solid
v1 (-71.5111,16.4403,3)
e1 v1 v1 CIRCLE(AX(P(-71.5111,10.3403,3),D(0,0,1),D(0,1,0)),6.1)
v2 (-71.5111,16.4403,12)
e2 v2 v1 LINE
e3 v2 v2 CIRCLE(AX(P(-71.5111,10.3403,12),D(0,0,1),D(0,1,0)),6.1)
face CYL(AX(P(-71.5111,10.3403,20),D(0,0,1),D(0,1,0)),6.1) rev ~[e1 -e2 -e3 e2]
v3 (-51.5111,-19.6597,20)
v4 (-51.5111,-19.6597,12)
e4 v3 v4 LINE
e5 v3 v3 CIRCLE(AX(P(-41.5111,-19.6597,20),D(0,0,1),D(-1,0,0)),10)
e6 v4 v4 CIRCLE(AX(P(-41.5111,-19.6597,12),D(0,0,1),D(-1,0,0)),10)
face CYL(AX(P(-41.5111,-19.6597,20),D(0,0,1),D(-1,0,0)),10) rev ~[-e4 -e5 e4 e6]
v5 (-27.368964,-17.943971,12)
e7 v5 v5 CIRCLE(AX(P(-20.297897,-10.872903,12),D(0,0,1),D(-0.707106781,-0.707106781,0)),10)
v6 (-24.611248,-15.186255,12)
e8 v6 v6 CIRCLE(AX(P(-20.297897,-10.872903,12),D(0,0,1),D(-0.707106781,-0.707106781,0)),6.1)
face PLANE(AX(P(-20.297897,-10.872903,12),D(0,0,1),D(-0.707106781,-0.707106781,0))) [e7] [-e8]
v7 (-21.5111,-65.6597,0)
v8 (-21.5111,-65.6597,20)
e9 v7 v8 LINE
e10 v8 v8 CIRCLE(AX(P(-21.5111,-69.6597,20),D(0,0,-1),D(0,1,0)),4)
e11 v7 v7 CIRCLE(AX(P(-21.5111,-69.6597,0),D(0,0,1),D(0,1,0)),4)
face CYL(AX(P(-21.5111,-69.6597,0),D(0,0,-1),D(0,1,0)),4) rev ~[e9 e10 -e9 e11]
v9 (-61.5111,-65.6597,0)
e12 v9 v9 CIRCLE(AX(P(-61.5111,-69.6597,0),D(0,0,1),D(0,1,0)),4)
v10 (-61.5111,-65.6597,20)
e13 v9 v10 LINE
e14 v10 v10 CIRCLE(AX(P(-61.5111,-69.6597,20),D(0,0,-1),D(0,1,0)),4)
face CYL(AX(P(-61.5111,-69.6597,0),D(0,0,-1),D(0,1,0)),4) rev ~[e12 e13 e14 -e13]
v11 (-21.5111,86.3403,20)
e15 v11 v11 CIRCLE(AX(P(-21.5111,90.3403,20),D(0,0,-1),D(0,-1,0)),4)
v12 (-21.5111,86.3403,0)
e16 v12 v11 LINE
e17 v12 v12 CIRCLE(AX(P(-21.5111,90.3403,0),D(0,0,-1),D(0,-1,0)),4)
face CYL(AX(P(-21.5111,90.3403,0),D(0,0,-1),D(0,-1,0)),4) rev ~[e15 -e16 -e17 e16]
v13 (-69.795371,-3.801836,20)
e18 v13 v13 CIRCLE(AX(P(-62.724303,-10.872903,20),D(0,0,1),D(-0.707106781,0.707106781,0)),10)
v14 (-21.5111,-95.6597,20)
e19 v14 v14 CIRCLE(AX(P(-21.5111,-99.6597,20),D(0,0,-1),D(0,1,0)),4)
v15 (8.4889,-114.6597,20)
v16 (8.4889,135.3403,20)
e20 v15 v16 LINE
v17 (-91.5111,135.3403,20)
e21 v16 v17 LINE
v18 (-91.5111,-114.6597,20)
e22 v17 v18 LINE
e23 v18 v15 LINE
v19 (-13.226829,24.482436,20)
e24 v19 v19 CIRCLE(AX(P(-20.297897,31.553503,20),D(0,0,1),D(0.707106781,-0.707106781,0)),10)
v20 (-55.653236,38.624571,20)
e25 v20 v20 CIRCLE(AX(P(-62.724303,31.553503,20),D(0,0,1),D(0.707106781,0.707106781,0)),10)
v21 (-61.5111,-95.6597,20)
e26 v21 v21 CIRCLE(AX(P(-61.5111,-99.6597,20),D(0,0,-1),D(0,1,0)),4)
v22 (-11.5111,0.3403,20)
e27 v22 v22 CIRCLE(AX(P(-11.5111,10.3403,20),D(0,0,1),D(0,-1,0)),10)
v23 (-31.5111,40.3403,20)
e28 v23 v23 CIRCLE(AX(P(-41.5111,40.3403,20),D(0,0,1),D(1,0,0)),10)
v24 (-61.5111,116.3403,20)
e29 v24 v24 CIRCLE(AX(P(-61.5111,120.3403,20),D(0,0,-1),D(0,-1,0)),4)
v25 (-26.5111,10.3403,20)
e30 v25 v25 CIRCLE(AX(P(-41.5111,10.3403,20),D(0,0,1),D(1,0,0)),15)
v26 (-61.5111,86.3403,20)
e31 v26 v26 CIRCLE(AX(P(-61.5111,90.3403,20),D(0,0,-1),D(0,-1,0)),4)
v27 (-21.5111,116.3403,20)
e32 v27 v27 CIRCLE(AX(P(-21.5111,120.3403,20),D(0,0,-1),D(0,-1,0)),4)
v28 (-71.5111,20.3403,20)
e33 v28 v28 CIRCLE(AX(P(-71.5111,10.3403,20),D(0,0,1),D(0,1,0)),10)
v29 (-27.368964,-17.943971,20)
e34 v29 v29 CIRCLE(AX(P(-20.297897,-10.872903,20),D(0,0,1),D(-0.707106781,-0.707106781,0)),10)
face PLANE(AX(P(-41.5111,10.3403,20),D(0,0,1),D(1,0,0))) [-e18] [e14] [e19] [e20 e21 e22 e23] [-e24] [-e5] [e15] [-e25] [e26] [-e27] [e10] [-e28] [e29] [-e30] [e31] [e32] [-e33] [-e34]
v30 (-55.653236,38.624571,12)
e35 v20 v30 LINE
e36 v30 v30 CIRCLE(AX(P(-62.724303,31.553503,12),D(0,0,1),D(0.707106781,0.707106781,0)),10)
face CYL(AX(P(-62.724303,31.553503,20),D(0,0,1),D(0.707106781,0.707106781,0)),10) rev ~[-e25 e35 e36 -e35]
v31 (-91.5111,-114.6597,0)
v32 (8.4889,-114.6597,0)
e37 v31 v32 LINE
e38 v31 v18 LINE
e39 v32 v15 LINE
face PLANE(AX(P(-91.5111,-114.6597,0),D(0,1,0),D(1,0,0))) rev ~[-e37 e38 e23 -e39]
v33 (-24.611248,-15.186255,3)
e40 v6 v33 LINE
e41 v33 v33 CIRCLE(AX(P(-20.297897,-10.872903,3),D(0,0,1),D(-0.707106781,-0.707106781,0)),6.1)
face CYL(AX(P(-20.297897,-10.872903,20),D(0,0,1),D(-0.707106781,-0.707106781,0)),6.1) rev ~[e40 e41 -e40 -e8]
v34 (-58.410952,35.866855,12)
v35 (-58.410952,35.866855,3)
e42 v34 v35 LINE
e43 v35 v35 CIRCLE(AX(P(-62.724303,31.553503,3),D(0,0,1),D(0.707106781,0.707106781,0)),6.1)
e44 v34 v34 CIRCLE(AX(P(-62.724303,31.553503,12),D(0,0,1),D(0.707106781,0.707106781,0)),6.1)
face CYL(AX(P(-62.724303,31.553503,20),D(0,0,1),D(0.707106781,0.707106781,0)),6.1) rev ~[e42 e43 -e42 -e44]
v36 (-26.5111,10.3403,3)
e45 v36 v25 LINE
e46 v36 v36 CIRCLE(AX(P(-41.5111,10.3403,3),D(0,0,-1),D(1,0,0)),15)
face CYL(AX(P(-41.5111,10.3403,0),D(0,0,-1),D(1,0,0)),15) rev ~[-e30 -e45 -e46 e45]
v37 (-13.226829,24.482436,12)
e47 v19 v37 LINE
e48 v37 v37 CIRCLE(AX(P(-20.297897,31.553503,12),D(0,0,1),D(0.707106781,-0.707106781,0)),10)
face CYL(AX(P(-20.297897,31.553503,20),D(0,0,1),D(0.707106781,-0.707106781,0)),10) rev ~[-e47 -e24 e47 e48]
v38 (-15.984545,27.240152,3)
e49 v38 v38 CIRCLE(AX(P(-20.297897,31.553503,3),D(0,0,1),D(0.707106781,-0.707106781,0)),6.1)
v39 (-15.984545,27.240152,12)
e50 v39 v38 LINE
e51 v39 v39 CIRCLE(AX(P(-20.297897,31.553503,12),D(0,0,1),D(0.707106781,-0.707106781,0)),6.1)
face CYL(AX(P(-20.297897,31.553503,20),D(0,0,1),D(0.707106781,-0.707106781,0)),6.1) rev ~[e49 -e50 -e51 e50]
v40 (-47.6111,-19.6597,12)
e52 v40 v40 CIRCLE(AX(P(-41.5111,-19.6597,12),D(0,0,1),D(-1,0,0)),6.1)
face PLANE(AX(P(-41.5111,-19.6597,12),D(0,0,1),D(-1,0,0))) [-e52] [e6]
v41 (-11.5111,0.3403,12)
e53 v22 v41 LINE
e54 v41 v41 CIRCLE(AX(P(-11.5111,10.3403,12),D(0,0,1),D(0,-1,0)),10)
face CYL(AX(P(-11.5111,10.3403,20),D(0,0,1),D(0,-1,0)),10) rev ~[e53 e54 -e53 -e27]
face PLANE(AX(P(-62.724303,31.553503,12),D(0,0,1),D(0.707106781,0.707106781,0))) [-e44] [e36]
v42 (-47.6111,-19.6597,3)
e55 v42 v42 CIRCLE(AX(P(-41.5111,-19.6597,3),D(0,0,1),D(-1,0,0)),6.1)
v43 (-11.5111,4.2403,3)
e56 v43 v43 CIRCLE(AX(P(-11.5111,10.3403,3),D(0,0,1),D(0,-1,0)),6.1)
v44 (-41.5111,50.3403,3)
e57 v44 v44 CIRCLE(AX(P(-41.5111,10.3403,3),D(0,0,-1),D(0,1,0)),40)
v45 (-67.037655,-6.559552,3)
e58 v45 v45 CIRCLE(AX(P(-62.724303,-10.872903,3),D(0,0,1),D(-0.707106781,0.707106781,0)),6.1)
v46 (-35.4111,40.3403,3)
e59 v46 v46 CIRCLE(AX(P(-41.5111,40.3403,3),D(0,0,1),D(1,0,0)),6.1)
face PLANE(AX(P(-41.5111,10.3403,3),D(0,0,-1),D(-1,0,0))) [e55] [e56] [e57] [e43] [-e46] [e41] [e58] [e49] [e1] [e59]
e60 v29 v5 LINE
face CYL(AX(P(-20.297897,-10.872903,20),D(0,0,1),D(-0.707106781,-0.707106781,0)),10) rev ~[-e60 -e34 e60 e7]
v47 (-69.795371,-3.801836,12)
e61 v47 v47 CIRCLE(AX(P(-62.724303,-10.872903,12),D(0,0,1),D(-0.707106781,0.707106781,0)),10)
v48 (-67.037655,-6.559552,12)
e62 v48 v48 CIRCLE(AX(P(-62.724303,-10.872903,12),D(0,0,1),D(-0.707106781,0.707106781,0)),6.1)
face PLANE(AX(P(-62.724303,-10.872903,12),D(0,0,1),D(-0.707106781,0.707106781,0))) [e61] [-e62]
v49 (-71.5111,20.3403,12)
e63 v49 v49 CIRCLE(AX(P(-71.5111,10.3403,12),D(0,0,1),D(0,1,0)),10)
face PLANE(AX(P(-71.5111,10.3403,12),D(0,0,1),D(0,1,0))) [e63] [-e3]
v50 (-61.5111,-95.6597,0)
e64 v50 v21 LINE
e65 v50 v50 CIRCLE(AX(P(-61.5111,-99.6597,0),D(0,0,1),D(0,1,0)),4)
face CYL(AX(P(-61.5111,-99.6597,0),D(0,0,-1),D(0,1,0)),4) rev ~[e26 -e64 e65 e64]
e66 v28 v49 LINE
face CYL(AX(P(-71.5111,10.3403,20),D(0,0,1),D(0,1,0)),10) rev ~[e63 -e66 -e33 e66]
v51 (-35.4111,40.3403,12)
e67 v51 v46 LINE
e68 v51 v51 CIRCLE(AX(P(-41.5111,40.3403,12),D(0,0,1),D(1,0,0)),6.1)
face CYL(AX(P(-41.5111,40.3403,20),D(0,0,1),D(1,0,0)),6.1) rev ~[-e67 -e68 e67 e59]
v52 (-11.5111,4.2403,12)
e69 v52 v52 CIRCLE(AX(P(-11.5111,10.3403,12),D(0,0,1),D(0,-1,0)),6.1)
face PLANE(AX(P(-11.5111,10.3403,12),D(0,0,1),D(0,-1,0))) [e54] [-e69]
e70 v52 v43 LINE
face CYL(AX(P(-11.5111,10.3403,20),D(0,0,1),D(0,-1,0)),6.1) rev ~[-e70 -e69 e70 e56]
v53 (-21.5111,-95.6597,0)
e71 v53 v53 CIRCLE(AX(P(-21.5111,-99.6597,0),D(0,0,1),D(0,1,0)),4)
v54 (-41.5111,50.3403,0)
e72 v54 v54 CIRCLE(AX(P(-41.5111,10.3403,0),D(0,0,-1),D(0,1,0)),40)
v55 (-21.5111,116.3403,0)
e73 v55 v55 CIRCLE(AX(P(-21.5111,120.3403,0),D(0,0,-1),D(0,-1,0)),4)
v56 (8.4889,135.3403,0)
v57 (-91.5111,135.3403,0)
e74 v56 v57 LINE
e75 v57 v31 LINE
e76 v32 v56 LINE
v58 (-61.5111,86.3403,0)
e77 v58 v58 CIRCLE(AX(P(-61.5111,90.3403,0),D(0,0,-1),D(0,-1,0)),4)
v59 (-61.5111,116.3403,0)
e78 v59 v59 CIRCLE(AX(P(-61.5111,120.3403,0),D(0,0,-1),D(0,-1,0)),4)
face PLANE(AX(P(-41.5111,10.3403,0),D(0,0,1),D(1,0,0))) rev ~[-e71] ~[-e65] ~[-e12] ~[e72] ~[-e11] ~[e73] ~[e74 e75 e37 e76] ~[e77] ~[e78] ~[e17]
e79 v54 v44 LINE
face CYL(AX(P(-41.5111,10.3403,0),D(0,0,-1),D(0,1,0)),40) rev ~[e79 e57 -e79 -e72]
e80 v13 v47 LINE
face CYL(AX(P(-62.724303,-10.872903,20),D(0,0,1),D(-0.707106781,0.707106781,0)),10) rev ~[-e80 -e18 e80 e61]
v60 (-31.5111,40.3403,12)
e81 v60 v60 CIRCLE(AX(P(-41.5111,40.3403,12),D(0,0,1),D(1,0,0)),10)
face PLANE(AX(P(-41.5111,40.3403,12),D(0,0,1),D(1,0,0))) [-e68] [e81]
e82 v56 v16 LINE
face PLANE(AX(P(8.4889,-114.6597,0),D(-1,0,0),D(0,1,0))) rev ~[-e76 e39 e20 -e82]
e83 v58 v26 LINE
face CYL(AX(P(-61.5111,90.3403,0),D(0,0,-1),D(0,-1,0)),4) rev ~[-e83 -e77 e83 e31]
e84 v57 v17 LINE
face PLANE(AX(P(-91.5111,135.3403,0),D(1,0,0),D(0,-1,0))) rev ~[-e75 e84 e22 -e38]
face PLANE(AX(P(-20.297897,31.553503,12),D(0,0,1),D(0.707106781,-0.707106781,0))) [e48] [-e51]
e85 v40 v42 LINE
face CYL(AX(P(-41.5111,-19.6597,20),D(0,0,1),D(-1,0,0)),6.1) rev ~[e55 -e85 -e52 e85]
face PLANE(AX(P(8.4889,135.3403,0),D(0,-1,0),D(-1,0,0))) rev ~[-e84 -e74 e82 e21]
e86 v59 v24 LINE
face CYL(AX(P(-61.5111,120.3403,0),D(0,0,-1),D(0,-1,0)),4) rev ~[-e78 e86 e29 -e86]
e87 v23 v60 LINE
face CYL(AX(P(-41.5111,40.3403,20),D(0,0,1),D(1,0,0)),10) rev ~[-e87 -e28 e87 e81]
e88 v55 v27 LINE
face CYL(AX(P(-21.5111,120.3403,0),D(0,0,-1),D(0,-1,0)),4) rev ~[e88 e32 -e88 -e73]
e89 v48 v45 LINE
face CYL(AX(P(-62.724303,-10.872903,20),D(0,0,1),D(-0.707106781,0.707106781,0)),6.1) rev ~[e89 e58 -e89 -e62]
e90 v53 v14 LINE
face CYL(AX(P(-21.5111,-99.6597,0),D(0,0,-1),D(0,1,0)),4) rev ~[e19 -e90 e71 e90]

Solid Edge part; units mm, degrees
sketch "Sketch1" plane through (0, 0, 0) normal (0, 0, 1) x (1, 0, 0)
  circle A0 centre (-41.5111, 10.3403) radius 15
  line L0 (-91.5111, 135.3403) -> (-91.5111, -114.6597)
  line L1 (-91.5111, -114.6597) -> (8.4889, -114.6597)
  line L2 (8.4889, -114.6597) -> (8.4889, 135.3403)
  line L3 (8.4889, 135.3403) -> (-91.5111, 135.3403)
  dimension "D1" = 30
  dimension "D2" = 100
  dimension "D3" = 250
extrude "Protrusion1" add sketch "Sketch1" along normal blind 20
sketch "Sketch2" plane through (-51.5111, 20.3403, 0) normal (0, 0, -1) x (0, -1, 0)
  circle A0 centre (-100, -30) radius 4
  circle A1 centre (-70, 10) radius 4
  circle A2 centre (-70, -30) radius 4
  circle A3 centre (-100, 10) radius 4
  dimension "D1" = 8
  dimension "D2" = 8
  dimension "D3" = 8
  dimension "D4" = 8
  dimension "D5" = 30
  dimension "D6" = 30
  dimension "D7" = 20
  dimension "D8" = 20
  dimension "D9" = 15
extrude "Cutout1" cut sketch "Sketch2" against normal through all
mirror "Mirror1" about plane through (-51.5111, 10.3403, 5) normal (0, 1, 0) of "Cutout1"
sketch "Sketch3" plane through (-46.5111, 10.3403, 20) normal (0, 0, 1) x (1, 0, 0)
  circle A0 centre (5, 30) radius 6.1
  dimension "D1" = 12.2
  dimension "D2" = 30
extrude "Cutout3" cut sketch "Sketch3" against normal through all
sketch "Sketch4" plane through (-41.5111, 10.3403, 20) normal (0, 0, 1) x (1, 0, 0)
  circle A0 centre (0, 30) radius 10
  dimension "D1" = 20
extrude "Cutout4" cut sketch "Sketch4" against normal blind 8
pattern_circular "Pattern1" count 8 over 360 about axis through (-41.5111, 10.3403, 20) along (0, 0, -1) of "Cutout3", "Cutout4"
sketch "Sketch5" plane through (-41.5111, 10.3403, 0) normal (0, 0, -1) x (0, 1, 0)
  circle A0 centre (0, 0) radius 40
  dimension "D1" = 80
extrude "ExtrudedCutout_14" cut sketch "Sketch5" against normal blind 3
properties material "Aluminum, 6061-T6"
